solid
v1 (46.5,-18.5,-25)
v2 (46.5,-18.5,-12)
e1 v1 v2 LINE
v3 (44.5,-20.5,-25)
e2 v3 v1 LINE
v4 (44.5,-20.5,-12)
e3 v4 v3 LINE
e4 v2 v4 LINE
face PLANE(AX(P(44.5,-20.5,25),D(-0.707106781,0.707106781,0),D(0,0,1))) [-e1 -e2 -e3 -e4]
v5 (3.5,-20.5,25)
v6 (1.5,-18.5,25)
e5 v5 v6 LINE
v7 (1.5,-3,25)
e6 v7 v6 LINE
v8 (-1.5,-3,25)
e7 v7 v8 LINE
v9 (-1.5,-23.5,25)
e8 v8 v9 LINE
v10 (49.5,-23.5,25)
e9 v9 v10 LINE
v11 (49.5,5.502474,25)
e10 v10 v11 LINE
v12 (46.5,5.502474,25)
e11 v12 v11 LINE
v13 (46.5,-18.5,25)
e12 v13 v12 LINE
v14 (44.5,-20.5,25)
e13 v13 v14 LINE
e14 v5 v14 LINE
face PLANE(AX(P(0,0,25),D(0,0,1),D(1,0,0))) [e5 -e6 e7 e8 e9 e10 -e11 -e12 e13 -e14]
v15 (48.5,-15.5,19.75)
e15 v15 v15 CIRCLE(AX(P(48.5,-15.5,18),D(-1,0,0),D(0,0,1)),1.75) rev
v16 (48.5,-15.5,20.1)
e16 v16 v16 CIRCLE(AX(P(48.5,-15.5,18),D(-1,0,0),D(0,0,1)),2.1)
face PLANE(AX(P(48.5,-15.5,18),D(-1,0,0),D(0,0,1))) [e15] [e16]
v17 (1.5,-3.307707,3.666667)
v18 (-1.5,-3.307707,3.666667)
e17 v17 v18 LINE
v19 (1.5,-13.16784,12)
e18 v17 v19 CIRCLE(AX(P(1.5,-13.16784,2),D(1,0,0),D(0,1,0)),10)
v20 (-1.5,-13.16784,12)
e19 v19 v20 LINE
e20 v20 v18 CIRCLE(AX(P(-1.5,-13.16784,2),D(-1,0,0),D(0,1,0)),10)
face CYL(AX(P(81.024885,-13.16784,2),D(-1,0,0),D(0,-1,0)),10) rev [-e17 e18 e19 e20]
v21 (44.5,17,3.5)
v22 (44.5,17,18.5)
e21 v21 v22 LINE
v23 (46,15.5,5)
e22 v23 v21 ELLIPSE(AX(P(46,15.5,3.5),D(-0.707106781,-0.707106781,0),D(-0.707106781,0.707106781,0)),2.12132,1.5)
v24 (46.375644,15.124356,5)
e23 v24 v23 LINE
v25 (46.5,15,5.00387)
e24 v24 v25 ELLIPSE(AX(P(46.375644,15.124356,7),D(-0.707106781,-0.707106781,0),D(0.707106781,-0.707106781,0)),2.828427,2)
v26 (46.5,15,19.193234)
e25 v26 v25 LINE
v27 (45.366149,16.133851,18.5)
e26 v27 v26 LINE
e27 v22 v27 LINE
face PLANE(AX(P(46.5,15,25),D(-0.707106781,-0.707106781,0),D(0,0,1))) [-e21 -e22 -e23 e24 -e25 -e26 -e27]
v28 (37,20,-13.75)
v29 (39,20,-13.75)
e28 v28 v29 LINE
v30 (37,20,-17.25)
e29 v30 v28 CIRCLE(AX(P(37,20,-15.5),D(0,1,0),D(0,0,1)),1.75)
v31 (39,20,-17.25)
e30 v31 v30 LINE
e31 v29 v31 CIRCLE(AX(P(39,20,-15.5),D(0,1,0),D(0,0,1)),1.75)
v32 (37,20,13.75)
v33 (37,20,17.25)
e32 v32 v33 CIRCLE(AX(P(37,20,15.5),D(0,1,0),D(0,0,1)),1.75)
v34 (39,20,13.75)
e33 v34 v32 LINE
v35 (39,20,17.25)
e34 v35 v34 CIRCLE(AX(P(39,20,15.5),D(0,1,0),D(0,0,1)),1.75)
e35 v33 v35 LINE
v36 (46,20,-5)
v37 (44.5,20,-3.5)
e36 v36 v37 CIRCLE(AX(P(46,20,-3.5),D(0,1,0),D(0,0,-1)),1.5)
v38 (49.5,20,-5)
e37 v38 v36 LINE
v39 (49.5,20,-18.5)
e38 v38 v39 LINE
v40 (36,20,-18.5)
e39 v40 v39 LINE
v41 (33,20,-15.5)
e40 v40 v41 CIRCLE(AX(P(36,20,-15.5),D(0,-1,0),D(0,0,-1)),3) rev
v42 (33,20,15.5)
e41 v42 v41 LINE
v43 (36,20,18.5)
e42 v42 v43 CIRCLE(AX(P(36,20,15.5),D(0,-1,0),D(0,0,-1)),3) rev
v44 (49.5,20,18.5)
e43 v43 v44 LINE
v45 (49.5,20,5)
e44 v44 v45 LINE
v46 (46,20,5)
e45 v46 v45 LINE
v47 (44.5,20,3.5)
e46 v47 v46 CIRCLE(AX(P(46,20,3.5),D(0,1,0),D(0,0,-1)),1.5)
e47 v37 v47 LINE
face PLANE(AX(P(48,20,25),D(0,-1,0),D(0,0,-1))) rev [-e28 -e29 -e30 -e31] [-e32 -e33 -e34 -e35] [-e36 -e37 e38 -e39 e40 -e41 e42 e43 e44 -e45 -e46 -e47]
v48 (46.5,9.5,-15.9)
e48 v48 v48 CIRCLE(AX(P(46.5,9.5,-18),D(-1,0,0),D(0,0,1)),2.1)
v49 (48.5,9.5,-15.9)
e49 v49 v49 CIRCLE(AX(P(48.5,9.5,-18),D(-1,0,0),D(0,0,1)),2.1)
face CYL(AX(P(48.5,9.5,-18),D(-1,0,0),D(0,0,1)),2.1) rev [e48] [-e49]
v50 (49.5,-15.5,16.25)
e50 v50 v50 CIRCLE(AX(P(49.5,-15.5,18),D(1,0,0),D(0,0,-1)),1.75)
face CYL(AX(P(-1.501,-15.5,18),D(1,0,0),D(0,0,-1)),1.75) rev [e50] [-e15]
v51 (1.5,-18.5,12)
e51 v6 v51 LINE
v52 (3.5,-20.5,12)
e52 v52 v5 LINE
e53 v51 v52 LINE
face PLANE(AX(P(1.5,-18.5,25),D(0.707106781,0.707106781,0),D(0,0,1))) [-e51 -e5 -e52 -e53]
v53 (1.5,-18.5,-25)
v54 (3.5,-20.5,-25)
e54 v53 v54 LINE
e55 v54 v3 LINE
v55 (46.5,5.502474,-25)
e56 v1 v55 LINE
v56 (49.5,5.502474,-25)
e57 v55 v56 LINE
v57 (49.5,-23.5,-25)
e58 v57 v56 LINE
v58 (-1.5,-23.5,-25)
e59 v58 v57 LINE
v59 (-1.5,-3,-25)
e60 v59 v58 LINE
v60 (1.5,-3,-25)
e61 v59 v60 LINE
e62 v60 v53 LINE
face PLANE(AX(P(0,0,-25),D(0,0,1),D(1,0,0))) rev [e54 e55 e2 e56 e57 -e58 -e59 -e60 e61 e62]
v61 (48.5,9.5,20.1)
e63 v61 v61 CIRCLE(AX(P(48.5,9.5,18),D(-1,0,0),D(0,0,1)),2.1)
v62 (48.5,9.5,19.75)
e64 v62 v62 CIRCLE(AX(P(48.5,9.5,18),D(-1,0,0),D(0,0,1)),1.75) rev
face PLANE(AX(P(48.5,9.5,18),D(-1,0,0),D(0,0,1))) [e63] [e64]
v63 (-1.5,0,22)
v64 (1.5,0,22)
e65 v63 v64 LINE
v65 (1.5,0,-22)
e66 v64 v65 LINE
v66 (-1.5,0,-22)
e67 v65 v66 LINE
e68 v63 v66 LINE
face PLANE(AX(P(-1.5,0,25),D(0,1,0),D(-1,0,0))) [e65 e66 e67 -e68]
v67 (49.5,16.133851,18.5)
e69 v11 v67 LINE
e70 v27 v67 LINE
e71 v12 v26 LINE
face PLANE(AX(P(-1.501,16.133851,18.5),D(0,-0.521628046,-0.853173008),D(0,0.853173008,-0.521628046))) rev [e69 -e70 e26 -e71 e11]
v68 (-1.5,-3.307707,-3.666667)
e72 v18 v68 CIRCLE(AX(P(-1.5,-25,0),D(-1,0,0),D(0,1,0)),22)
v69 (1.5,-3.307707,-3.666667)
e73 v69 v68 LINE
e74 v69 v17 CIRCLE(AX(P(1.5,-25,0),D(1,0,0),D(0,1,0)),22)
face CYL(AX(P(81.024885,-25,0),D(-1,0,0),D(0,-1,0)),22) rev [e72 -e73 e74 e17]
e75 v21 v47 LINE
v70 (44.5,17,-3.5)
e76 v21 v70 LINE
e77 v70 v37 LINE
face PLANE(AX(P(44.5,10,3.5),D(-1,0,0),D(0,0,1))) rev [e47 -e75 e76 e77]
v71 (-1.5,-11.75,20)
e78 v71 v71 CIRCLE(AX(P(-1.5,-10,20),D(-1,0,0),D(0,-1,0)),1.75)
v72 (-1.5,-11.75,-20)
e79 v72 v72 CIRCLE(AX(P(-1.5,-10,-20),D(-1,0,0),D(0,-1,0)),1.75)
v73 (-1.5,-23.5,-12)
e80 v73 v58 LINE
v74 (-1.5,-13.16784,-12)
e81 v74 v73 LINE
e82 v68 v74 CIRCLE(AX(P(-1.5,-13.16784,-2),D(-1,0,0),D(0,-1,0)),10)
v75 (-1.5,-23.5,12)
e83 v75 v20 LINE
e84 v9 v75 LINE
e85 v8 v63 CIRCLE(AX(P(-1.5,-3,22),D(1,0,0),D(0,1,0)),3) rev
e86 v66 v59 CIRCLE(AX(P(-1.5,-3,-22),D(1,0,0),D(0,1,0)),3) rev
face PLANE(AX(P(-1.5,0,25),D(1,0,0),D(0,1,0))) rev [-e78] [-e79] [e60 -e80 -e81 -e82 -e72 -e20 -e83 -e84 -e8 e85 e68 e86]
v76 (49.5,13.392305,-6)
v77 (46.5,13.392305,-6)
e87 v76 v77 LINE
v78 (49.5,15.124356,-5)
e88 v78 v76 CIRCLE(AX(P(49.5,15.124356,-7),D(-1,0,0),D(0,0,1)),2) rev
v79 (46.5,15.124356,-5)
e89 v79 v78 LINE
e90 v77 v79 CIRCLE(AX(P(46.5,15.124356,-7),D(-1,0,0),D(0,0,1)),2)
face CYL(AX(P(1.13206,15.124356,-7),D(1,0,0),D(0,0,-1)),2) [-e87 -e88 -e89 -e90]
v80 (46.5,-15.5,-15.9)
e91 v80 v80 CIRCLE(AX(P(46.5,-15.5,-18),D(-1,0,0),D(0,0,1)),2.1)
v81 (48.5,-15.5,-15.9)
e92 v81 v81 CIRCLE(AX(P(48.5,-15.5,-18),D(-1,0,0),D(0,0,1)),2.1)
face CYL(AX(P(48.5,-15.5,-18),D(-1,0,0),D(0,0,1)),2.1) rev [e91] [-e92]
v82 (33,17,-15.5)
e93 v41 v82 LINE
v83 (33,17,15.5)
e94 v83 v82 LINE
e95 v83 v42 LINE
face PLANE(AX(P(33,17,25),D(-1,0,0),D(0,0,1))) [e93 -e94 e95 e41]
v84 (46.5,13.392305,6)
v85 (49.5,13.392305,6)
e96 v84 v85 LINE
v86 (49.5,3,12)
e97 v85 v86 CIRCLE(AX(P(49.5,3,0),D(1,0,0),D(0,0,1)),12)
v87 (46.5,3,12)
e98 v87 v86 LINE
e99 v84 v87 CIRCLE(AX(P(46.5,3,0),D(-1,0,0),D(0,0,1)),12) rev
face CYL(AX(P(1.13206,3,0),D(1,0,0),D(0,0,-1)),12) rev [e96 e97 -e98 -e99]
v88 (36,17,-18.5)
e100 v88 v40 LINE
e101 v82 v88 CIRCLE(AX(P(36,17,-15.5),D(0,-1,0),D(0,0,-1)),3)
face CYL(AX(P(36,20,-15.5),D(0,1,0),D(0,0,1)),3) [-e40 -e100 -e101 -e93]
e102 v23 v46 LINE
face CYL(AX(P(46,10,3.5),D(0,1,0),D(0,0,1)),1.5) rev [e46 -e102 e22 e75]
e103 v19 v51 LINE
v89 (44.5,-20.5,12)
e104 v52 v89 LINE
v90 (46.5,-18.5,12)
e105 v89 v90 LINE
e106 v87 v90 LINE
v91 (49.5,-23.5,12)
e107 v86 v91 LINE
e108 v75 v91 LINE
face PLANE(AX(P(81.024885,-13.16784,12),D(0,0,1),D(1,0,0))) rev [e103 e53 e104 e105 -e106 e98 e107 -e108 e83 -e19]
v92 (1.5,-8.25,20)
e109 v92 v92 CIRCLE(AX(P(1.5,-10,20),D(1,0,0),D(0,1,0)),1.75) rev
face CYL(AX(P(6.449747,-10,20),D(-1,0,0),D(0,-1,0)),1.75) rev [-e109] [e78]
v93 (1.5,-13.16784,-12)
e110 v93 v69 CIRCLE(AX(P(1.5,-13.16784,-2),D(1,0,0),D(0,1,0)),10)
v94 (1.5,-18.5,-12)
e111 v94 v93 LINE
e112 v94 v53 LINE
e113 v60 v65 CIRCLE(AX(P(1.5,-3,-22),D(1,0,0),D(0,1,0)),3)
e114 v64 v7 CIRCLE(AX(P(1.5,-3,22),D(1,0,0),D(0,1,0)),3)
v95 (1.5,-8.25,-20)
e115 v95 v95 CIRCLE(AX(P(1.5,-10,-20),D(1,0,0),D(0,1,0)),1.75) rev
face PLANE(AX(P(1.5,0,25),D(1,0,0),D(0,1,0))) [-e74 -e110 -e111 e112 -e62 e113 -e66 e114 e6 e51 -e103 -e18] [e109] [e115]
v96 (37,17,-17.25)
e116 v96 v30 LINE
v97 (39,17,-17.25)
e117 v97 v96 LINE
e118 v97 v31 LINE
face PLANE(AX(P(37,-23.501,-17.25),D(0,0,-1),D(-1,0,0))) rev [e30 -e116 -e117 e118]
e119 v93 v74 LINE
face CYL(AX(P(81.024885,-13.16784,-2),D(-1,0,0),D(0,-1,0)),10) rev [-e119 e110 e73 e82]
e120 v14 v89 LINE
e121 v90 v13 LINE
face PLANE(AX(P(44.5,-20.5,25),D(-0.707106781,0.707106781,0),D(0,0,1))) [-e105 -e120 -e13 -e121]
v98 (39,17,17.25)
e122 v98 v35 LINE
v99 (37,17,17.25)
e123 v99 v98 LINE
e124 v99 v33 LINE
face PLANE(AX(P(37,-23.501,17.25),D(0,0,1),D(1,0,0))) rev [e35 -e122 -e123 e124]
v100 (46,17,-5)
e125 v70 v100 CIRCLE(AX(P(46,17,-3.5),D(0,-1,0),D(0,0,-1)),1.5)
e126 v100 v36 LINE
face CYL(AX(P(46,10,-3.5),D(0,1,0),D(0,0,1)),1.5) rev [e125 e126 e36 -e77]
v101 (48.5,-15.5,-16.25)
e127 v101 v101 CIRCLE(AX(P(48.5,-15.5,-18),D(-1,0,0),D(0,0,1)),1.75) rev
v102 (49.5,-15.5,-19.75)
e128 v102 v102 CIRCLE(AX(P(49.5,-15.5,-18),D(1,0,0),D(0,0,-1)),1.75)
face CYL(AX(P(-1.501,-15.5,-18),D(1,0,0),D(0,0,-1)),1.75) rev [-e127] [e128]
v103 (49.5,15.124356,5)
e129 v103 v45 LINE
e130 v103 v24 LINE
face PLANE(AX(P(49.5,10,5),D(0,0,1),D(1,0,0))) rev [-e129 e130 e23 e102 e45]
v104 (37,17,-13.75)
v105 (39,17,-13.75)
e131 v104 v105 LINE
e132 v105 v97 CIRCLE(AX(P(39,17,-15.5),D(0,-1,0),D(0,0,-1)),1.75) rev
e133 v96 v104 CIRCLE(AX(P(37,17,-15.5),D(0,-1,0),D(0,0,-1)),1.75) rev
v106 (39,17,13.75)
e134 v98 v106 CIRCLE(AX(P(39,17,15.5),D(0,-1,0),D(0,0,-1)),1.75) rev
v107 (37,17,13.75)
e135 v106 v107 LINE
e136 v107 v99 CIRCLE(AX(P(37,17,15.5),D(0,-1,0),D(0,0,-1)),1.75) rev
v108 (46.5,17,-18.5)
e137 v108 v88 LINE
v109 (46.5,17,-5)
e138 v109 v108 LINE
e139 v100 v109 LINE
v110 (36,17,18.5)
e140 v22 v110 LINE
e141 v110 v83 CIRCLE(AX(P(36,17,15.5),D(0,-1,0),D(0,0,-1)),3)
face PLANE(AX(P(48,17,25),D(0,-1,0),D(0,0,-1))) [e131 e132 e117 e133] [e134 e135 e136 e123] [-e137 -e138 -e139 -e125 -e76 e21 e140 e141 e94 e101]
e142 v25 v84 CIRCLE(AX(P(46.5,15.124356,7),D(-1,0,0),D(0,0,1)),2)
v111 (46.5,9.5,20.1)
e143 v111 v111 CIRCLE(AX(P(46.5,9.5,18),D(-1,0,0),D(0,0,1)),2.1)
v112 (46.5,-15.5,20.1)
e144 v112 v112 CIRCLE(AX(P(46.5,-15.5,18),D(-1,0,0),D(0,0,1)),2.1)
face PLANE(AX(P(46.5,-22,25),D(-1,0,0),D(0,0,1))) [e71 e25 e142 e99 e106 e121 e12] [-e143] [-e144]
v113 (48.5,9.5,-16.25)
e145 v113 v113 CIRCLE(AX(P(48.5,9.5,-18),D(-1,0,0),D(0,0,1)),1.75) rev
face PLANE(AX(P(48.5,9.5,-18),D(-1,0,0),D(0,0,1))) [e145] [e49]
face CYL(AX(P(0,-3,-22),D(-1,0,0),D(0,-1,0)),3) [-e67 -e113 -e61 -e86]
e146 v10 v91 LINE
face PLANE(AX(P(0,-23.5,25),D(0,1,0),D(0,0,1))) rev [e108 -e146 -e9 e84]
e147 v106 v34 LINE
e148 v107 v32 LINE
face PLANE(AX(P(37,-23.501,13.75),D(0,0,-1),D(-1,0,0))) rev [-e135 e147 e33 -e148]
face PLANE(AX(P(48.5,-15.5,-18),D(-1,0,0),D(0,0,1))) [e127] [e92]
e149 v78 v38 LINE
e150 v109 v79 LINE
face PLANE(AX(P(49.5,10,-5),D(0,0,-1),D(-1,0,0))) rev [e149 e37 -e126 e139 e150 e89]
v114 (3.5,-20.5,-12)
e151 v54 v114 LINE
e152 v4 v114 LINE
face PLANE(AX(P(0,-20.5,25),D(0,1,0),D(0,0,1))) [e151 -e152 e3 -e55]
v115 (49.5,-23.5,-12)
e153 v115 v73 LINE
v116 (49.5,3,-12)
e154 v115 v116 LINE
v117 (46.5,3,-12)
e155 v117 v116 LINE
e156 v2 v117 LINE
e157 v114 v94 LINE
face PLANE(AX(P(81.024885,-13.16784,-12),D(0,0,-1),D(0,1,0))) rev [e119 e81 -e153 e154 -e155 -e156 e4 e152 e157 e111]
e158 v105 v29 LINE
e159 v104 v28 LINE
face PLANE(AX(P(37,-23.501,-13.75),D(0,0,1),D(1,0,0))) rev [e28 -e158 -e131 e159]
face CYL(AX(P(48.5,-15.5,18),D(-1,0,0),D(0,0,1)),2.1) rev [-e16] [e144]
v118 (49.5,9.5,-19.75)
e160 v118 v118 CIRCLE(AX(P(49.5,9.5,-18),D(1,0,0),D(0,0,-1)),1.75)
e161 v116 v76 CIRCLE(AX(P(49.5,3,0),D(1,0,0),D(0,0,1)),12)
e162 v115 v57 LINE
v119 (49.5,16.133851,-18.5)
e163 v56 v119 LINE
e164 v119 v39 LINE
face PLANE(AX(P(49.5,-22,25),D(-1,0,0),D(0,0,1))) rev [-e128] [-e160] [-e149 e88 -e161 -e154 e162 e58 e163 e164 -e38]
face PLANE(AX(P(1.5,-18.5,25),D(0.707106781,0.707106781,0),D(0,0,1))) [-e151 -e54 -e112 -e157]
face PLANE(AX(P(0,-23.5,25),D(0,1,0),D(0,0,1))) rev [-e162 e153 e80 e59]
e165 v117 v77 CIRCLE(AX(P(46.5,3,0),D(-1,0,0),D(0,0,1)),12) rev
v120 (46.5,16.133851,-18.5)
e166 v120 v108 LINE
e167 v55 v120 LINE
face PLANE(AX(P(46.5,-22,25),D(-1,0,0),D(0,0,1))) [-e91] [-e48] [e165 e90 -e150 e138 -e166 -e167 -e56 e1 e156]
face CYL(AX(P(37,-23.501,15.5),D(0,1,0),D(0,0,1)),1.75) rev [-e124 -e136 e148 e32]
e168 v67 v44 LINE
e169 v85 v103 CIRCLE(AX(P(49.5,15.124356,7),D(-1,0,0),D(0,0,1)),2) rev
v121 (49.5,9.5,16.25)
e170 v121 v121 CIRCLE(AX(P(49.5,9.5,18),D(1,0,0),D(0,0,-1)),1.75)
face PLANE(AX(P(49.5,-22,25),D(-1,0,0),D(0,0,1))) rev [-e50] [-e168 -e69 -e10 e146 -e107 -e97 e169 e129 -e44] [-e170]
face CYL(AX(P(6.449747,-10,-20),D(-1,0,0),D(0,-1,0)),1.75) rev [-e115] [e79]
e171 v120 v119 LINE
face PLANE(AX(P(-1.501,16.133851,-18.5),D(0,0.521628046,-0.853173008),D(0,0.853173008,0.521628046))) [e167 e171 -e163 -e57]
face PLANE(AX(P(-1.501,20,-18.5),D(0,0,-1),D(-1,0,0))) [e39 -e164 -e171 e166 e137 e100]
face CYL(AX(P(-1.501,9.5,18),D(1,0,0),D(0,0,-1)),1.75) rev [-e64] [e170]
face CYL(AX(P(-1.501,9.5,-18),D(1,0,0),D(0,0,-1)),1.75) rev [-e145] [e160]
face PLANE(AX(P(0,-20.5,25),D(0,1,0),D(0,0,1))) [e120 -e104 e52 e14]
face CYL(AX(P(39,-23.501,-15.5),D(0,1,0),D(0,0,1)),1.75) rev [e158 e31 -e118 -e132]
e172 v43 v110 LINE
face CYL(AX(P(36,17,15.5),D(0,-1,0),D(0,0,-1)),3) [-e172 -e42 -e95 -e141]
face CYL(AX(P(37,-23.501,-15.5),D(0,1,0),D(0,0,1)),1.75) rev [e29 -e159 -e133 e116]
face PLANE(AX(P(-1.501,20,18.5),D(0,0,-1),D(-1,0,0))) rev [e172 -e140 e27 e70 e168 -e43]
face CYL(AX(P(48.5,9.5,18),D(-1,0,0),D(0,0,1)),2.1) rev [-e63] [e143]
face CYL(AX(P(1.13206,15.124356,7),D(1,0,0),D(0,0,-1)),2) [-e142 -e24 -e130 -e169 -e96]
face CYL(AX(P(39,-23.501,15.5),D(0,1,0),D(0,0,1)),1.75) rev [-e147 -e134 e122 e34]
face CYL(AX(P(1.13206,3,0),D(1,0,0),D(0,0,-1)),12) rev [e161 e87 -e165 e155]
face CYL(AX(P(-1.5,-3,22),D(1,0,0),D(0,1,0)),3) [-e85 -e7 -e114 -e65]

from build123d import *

# Parameters (mm, degrees)
EXTRUDE_THIN1_DEPTH = 25
SKETCH2_R           = 1.75
CUT_EXTRUDE1_DEPTH  = 3
CUT_EXTRUDE2_REACH  = 63.467
CUT_EXTRUDE3_REACH  = 63.467
CUT_EXTRUDE4_DEPTH  = 3
CUT_EXTRUDE5_REACH  = 72.48
SKETCH7_R           = 1.75
FILLET1_R           = 3
CUT_EXTRUDE7_REACH  = 63.467
SKETCH9_R           = 1.75
CUT_EXTRUDE8_START  = -3
CUT_EXTRUDE8_DEPTH  = 3
SKETCH11_R          = 2.1
CUT_EXTRUDE10_DEPTH = 2
CUT_EXTRUDE11_DEPTH = 10
CHAMFER1_SIZE       = 2
FILLET2_R           = 2


with BuildPart() as part:
    # Sketch1 → Extrude-Thin1 (new, symmetric)
    with BuildSketch(Plane.XY):
        Polygon((-1.5, 0), (-1.5, -23.5), (49.5, -23.5), (49.5, 20), (33, 20), (33, 17), (46.5, 17), (46.5, -20.5), (1.5, -20.5), (1.5, 0), align=None)
    extrude(amount=EXTRUDE_THIN1_DEPTH, both=True)

    # Sketch2 → Cut-Extrude1 (cut)
    with BuildSketch(Plane.ZY.offset(1.5)):
        with Locations(Location((-20, -10, 0), (0, 0, 270))):
            Circle(SKETCH2_R)
        with Locations(Location((20, -10, 0), (0, 0, 270))):
            Circle(SKETCH2_R)
    extrude(amount=-CUT_EXTRUDE1_DEPTH, mode=Mode.SUBTRACT)

    # Cut-Extrude2: up to this face of the body (flat: up to its plane)
    cut_extrude2_end = Plane(part.part.faces().sort_by_distance((46.5, -1.75, 0))[0])
    # Sketch3 → Cut-Extrude2 (cut, up to the picked face)
    with BuildSketch(Plane.ZY.offset(1.5), mode=Mode.PRIVATE) as cut_extrude2_sk1:
        with BuildLine():
            Line((-12, -13.167840434), (-12, -27.818696))
            Line((-12, -27.818696), (12, -27.818696))
            Line((12, -27.818696), (12, -13.167840434))
            ThreePointArc((12, -13.167840434), (9.637626158, -6.71286819), (3.666666667, -3.307707462))
            ThreePointArc((3.666666667, -3.307707462), (0, -3), (-3.666666667, -3.307707462))
            ThreePointArc((-3.666666667, -3.307707462), (-9.637626158, -6.71286819), (-12, -13.167840434))
        make_face()
    cut_extrude2_tool1 = split(extrude(cut_extrude2_sk1.sketch, amount=-CUT_EXTRUDE2_REACH, mode=Mode.PRIVATE), bisect_by=cut_extrude2_end, keep=Keep.BOTH, mode=Mode.PRIVATE)
    add(cut_extrude2_tool1.solids().sort_by(Axis((-1.5, -16.267413, 0), (1, 0, 0)))[0], mode=Mode.SUBTRACT)

    # Sketch5 → Cut-Extrude3 (cut, up to next)
    with BuildSketch(Plane(origin=(49.5, 0, 0), x_dir=(0, 0, -1), z_dir=(1, 0, 0)), mode=Mode.PRIVATE) as cut_extrude3_sk1:
        Polygon((-18.5, 20), (-18.5, 16.133851182), (-25, 5.502473915), (-25, 20), align=None)
    cut_extrude3_tool1 = extrude(cut_extrude3_sk1.sketch, amount=-CUT_EXTRUDE3_REACH, mode=Mode.PRIVATE) & part.part
    cut_extrude3 = cut_extrude3_tool1.solids().sort_by_distance((49.5, 14.896175, 22.37718))[0]
    add(cut_extrude3, mode=Mode.SUBTRACT)

    # Mirror1: Cut-Extrude3 across plane
    add(cut_extrude3.mirror(Plane.XY), mode=Mode.SUBTRACT)

    # Sketch6 → Cut-Extrude4 (cut)
    with BuildSketch(Plane(origin=(49.5, 0, 0), x_dir=(0, 0, -1), z_dir=(1, 0, 0))):
        with BuildLine():
            Line((-12, -23.5), (12, -23.5))
            Line((12, -23.5), (12, 3))
            ThreePointArc((12, 3), (0, 15), (-12, 3))
            Line((-12, 3), (-12, -23.5))
        make_face()
    extrude(amount=-CUT_EXTRUDE4_DEPTH, mode=Mode.SUBTRACT)

    # Sketch7 → Cut-Extrude5 (cut, up to next)
    with BuildSketch(Plane(origin=(0, 20, 0), x_dir=(1, 0, 0), z_dir=(0, 1, 0)), mode=Mode.PRIVATE) as cut_extrude5_sk1:
        with Locations(Location((38, 15.5, 0), (0, 0, 180))):
            Circle(SKETCH7_R)
    cut_extrude5_tool1 = extrude(cut_extrude5_sk1.sketch, amount=-CUT_EXTRUDE5_REACH, mode=Mode.PRIVATE) & part.part
    # Sketch7 → Cut-Extrude5 (cut, up to next)
    with BuildSketch(Plane(origin=(0, 20, 0), x_dir=(1, 0, 0), z_dir=(0, 1, 0)), mode=Mode.PRIVATE) as cut_extrude5_sk2:
        with Locations(Location((38, -15.5, 0), (0, 0, 180))):
            Circle(SKETCH7_R)
    cut_extrude5_tool2 = extrude(cut_extrude5_sk2.sketch, amount=-CUT_EXTRUDE5_REACH, mode=Mode.PRIVATE) & part.part
    add(cut_extrude5_tool1.solids().sort_by_distance((38, 20, -15.5))[0], mode=Mode.SUBTRACT)
    add(cut_extrude5_tool2.solids().sort_by_distance((38, 20, 15.5))[0], mode=Mode.SUBTRACT)

    # Fillet1
    fillet1_edges = [part.edges().sort_by_distance(p)[0] for p in [
        (0, 0, 25),
        (33, 18.5, 18.5),
        (0, 0, -25),
        (33, 18.5, -18.5),
    ]]
    fillet(fillet1_edges, radius=FILLET1_R)

    # Sketch9 → Cut-Extrude7 (cut, up to next)
    with BuildSketch(Plane(origin=(49.5, 0, 0), x_dir=(0, 0, -1), z_dir=(1, 0, 0)), mode=Mode.PRIVATE) as cut_extrude7_sk1:
        with Locations((-18, -15.5)):
            Circle(SKETCH9_R)
    cut_extrude7_tool1 = extrude(cut_extrude7_sk1.sketch, amount=-CUT_EXTRUDE7_REACH, mode=Mode.PRIVATE) & part.part
    # Sketch9 → Cut-Extrude7 (cut, up to next)
    with BuildSketch(Plane(origin=(49.5, 0, 0), x_dir=(0, 0, -1), z_dir=(1, 0, 0)), mode=Mode.PRIVATE) as cut_extrude7_sk2:
        with Locations((18, -15.5)):
            Circle(SKETCH9_R)
    cut_extrude7_tool2 = extrude(cut_extrude7_sk2.sketch, amount=-CUT_EXTRUDE7_REACH, mode=Mode.PRIVATE) & part.part
    # Sketch9 → Cut-Extrude7 (cut, up to next)
    with BuildSketch(Plane(origin=(49.5, 0, 0), x_dir=(0, 0, -1), z_dir=(1, 0, 0)), mode=Mode.PRIVATE) as cut_extrude7_sk3:
        with Locations((-18, 9.5)):
            Circle(SKETCH9_R)
    cut_extrude7_tool3 = extrude(cut_extrude7_sk3.sketch, amount=-CUT_EXTRUDE7_REACH, mode=Mode.PRIVATE) & part.part
    # Sketch9 → Cut-Extrude7 (cut, up to next)
    with BuildSketch(Plane(origin=(49.5, 0, 0), x_dir=(0, 0, -1), z_dir=(1, 0, 0)), mode=Mode.PRIVATE) as cut_extrude7_sk4:
        with Locations((18, 9.5)):
            Circle(SKETCH9_R)
    cut_extrude7_tool4 = extrude(cut_extrude7_sk4.sketch, amount=-CUT_EXTRUDE7_REACH, mode=Mode.PRIVATE) & part.part
    add(cut_extrude7_tool1.solids().sort_by_distance((49.5, -15.5, 18))[0], mode=Mode.SUBTRACT)
    add(cut_extrude7_tool2.solids().sort_by_distance((49.5, -15.5, -18))[0], mode=Mode.SUBTRACT)
    add(cut_extrude7_tool3.solids().sort_by_distance((49.5, 9.5, 18))[0], mode=Mode.SUBTRACT)
    add(cut_extrude7_tool4.solids().sort_by_distance((49.5, 9.5, -18))[0], mode=Mode.SUBTRACT)

    # Sketch10 → Cut-Extrude8 (cut)
    with BuildSketch(Plane(origin=(0, 20, 0), x_dir=(1, 0, 0), z_dir=(0, 1, 0)).offset(CUT_EXTRUDE8_START)):
        with BuildLine():
            Line((37, 17.25), (39, 17.25))
            ThreePointArc((39, 17.25), (40.75, 15.5), (39, 13.75))
            Line((39, 13.75), (37, 13.75))
            ThreePointArc((37, 13.75), (35.25, 15.5), (37, 17.25))
        make_face()
        with BuildLine():
            Line((37, -13.75), (39, -13.75))
            ThreePointArc((39, -13.75), (40.75, -15.5), (39, -17.25))
            Line((39, -17.25), (37, -17.25))
            ThreePointArc((37, -17.25), (35.25, -15.5), (37, -13.75))
        make_face()
    extrude(amount=CUT_EXTRUDE8_DEPTH, mode=Mode.SUBTRACT)

    # Sketch11 → Cut-Extrude10 (cut)
    with BuildSketch(Plane.ZY.offset(-46.5)):
        with Locations((-18, 9.5)):
            Circle(SKETCH11_R)
        with Locations((18, 9.5)):
            Circle(SKETCH11_R)
        with Locations((18, -15.5)):
            Circle(SKETCH11_R)
        with Locations((-18, -15.5)):
            Circle(SKETCH11_R)
    extrude(amount=-CUT_EXTRUDE10_DEPTH, mode=Mode.SUBTRACT)

    # Sketch12 → Cut-Extrude11 (cut)
    with BuildSketch(Plane(origin=(0, 20, 0), x_dir=(1, 0, 0), z_dir=(0, 1, 0))):
        with BuildLine():
            Line((49.5, -5), (46, -5))
            ThreePointArc((46, -5), (44.939339828, -4.560660172), (44.5, -3.5))
            Line((44.5, -3.5), (44.5, 3.5))
            ThreePointArc((44.5, 3.5), (44.939339828, 4.560660172), (46, 5))
            Line((46, 5), (49.5, 5))
            Line((49.5, 5), (49.5, -5))
        make_face()
    extrude(amount=-CUT_EXTRUDE11_DEPTH, mode=Mode.SUBTRACT)

    # Chamfer1
    chamfer1_edges = [part.edges().sort_by_distance(p)[0] for p in [
        (46.5, 17, 11.75),
        (1.5, -20.5, -18.5),
        (1.5, -20.5, 18.5),
        (46.5, -20.5, 18.5),
        (46.5, -20.5, -18.5),
    ]]
    chamfer(chamfer1_edges, length=CHAMFER1_SIZE - 0.0001)  # a hair under: the kernel refuses the full size

    # Fillet2
    fillet2_edges = [part.edges().sort_by_distance(p)[0] for p in [
        (48, 13.908712115, -5),
        (48, 13.908712115, 5),
    ]]
    fillet(fillet2_edges, radius=FILLET2_R)


solid = part.part
